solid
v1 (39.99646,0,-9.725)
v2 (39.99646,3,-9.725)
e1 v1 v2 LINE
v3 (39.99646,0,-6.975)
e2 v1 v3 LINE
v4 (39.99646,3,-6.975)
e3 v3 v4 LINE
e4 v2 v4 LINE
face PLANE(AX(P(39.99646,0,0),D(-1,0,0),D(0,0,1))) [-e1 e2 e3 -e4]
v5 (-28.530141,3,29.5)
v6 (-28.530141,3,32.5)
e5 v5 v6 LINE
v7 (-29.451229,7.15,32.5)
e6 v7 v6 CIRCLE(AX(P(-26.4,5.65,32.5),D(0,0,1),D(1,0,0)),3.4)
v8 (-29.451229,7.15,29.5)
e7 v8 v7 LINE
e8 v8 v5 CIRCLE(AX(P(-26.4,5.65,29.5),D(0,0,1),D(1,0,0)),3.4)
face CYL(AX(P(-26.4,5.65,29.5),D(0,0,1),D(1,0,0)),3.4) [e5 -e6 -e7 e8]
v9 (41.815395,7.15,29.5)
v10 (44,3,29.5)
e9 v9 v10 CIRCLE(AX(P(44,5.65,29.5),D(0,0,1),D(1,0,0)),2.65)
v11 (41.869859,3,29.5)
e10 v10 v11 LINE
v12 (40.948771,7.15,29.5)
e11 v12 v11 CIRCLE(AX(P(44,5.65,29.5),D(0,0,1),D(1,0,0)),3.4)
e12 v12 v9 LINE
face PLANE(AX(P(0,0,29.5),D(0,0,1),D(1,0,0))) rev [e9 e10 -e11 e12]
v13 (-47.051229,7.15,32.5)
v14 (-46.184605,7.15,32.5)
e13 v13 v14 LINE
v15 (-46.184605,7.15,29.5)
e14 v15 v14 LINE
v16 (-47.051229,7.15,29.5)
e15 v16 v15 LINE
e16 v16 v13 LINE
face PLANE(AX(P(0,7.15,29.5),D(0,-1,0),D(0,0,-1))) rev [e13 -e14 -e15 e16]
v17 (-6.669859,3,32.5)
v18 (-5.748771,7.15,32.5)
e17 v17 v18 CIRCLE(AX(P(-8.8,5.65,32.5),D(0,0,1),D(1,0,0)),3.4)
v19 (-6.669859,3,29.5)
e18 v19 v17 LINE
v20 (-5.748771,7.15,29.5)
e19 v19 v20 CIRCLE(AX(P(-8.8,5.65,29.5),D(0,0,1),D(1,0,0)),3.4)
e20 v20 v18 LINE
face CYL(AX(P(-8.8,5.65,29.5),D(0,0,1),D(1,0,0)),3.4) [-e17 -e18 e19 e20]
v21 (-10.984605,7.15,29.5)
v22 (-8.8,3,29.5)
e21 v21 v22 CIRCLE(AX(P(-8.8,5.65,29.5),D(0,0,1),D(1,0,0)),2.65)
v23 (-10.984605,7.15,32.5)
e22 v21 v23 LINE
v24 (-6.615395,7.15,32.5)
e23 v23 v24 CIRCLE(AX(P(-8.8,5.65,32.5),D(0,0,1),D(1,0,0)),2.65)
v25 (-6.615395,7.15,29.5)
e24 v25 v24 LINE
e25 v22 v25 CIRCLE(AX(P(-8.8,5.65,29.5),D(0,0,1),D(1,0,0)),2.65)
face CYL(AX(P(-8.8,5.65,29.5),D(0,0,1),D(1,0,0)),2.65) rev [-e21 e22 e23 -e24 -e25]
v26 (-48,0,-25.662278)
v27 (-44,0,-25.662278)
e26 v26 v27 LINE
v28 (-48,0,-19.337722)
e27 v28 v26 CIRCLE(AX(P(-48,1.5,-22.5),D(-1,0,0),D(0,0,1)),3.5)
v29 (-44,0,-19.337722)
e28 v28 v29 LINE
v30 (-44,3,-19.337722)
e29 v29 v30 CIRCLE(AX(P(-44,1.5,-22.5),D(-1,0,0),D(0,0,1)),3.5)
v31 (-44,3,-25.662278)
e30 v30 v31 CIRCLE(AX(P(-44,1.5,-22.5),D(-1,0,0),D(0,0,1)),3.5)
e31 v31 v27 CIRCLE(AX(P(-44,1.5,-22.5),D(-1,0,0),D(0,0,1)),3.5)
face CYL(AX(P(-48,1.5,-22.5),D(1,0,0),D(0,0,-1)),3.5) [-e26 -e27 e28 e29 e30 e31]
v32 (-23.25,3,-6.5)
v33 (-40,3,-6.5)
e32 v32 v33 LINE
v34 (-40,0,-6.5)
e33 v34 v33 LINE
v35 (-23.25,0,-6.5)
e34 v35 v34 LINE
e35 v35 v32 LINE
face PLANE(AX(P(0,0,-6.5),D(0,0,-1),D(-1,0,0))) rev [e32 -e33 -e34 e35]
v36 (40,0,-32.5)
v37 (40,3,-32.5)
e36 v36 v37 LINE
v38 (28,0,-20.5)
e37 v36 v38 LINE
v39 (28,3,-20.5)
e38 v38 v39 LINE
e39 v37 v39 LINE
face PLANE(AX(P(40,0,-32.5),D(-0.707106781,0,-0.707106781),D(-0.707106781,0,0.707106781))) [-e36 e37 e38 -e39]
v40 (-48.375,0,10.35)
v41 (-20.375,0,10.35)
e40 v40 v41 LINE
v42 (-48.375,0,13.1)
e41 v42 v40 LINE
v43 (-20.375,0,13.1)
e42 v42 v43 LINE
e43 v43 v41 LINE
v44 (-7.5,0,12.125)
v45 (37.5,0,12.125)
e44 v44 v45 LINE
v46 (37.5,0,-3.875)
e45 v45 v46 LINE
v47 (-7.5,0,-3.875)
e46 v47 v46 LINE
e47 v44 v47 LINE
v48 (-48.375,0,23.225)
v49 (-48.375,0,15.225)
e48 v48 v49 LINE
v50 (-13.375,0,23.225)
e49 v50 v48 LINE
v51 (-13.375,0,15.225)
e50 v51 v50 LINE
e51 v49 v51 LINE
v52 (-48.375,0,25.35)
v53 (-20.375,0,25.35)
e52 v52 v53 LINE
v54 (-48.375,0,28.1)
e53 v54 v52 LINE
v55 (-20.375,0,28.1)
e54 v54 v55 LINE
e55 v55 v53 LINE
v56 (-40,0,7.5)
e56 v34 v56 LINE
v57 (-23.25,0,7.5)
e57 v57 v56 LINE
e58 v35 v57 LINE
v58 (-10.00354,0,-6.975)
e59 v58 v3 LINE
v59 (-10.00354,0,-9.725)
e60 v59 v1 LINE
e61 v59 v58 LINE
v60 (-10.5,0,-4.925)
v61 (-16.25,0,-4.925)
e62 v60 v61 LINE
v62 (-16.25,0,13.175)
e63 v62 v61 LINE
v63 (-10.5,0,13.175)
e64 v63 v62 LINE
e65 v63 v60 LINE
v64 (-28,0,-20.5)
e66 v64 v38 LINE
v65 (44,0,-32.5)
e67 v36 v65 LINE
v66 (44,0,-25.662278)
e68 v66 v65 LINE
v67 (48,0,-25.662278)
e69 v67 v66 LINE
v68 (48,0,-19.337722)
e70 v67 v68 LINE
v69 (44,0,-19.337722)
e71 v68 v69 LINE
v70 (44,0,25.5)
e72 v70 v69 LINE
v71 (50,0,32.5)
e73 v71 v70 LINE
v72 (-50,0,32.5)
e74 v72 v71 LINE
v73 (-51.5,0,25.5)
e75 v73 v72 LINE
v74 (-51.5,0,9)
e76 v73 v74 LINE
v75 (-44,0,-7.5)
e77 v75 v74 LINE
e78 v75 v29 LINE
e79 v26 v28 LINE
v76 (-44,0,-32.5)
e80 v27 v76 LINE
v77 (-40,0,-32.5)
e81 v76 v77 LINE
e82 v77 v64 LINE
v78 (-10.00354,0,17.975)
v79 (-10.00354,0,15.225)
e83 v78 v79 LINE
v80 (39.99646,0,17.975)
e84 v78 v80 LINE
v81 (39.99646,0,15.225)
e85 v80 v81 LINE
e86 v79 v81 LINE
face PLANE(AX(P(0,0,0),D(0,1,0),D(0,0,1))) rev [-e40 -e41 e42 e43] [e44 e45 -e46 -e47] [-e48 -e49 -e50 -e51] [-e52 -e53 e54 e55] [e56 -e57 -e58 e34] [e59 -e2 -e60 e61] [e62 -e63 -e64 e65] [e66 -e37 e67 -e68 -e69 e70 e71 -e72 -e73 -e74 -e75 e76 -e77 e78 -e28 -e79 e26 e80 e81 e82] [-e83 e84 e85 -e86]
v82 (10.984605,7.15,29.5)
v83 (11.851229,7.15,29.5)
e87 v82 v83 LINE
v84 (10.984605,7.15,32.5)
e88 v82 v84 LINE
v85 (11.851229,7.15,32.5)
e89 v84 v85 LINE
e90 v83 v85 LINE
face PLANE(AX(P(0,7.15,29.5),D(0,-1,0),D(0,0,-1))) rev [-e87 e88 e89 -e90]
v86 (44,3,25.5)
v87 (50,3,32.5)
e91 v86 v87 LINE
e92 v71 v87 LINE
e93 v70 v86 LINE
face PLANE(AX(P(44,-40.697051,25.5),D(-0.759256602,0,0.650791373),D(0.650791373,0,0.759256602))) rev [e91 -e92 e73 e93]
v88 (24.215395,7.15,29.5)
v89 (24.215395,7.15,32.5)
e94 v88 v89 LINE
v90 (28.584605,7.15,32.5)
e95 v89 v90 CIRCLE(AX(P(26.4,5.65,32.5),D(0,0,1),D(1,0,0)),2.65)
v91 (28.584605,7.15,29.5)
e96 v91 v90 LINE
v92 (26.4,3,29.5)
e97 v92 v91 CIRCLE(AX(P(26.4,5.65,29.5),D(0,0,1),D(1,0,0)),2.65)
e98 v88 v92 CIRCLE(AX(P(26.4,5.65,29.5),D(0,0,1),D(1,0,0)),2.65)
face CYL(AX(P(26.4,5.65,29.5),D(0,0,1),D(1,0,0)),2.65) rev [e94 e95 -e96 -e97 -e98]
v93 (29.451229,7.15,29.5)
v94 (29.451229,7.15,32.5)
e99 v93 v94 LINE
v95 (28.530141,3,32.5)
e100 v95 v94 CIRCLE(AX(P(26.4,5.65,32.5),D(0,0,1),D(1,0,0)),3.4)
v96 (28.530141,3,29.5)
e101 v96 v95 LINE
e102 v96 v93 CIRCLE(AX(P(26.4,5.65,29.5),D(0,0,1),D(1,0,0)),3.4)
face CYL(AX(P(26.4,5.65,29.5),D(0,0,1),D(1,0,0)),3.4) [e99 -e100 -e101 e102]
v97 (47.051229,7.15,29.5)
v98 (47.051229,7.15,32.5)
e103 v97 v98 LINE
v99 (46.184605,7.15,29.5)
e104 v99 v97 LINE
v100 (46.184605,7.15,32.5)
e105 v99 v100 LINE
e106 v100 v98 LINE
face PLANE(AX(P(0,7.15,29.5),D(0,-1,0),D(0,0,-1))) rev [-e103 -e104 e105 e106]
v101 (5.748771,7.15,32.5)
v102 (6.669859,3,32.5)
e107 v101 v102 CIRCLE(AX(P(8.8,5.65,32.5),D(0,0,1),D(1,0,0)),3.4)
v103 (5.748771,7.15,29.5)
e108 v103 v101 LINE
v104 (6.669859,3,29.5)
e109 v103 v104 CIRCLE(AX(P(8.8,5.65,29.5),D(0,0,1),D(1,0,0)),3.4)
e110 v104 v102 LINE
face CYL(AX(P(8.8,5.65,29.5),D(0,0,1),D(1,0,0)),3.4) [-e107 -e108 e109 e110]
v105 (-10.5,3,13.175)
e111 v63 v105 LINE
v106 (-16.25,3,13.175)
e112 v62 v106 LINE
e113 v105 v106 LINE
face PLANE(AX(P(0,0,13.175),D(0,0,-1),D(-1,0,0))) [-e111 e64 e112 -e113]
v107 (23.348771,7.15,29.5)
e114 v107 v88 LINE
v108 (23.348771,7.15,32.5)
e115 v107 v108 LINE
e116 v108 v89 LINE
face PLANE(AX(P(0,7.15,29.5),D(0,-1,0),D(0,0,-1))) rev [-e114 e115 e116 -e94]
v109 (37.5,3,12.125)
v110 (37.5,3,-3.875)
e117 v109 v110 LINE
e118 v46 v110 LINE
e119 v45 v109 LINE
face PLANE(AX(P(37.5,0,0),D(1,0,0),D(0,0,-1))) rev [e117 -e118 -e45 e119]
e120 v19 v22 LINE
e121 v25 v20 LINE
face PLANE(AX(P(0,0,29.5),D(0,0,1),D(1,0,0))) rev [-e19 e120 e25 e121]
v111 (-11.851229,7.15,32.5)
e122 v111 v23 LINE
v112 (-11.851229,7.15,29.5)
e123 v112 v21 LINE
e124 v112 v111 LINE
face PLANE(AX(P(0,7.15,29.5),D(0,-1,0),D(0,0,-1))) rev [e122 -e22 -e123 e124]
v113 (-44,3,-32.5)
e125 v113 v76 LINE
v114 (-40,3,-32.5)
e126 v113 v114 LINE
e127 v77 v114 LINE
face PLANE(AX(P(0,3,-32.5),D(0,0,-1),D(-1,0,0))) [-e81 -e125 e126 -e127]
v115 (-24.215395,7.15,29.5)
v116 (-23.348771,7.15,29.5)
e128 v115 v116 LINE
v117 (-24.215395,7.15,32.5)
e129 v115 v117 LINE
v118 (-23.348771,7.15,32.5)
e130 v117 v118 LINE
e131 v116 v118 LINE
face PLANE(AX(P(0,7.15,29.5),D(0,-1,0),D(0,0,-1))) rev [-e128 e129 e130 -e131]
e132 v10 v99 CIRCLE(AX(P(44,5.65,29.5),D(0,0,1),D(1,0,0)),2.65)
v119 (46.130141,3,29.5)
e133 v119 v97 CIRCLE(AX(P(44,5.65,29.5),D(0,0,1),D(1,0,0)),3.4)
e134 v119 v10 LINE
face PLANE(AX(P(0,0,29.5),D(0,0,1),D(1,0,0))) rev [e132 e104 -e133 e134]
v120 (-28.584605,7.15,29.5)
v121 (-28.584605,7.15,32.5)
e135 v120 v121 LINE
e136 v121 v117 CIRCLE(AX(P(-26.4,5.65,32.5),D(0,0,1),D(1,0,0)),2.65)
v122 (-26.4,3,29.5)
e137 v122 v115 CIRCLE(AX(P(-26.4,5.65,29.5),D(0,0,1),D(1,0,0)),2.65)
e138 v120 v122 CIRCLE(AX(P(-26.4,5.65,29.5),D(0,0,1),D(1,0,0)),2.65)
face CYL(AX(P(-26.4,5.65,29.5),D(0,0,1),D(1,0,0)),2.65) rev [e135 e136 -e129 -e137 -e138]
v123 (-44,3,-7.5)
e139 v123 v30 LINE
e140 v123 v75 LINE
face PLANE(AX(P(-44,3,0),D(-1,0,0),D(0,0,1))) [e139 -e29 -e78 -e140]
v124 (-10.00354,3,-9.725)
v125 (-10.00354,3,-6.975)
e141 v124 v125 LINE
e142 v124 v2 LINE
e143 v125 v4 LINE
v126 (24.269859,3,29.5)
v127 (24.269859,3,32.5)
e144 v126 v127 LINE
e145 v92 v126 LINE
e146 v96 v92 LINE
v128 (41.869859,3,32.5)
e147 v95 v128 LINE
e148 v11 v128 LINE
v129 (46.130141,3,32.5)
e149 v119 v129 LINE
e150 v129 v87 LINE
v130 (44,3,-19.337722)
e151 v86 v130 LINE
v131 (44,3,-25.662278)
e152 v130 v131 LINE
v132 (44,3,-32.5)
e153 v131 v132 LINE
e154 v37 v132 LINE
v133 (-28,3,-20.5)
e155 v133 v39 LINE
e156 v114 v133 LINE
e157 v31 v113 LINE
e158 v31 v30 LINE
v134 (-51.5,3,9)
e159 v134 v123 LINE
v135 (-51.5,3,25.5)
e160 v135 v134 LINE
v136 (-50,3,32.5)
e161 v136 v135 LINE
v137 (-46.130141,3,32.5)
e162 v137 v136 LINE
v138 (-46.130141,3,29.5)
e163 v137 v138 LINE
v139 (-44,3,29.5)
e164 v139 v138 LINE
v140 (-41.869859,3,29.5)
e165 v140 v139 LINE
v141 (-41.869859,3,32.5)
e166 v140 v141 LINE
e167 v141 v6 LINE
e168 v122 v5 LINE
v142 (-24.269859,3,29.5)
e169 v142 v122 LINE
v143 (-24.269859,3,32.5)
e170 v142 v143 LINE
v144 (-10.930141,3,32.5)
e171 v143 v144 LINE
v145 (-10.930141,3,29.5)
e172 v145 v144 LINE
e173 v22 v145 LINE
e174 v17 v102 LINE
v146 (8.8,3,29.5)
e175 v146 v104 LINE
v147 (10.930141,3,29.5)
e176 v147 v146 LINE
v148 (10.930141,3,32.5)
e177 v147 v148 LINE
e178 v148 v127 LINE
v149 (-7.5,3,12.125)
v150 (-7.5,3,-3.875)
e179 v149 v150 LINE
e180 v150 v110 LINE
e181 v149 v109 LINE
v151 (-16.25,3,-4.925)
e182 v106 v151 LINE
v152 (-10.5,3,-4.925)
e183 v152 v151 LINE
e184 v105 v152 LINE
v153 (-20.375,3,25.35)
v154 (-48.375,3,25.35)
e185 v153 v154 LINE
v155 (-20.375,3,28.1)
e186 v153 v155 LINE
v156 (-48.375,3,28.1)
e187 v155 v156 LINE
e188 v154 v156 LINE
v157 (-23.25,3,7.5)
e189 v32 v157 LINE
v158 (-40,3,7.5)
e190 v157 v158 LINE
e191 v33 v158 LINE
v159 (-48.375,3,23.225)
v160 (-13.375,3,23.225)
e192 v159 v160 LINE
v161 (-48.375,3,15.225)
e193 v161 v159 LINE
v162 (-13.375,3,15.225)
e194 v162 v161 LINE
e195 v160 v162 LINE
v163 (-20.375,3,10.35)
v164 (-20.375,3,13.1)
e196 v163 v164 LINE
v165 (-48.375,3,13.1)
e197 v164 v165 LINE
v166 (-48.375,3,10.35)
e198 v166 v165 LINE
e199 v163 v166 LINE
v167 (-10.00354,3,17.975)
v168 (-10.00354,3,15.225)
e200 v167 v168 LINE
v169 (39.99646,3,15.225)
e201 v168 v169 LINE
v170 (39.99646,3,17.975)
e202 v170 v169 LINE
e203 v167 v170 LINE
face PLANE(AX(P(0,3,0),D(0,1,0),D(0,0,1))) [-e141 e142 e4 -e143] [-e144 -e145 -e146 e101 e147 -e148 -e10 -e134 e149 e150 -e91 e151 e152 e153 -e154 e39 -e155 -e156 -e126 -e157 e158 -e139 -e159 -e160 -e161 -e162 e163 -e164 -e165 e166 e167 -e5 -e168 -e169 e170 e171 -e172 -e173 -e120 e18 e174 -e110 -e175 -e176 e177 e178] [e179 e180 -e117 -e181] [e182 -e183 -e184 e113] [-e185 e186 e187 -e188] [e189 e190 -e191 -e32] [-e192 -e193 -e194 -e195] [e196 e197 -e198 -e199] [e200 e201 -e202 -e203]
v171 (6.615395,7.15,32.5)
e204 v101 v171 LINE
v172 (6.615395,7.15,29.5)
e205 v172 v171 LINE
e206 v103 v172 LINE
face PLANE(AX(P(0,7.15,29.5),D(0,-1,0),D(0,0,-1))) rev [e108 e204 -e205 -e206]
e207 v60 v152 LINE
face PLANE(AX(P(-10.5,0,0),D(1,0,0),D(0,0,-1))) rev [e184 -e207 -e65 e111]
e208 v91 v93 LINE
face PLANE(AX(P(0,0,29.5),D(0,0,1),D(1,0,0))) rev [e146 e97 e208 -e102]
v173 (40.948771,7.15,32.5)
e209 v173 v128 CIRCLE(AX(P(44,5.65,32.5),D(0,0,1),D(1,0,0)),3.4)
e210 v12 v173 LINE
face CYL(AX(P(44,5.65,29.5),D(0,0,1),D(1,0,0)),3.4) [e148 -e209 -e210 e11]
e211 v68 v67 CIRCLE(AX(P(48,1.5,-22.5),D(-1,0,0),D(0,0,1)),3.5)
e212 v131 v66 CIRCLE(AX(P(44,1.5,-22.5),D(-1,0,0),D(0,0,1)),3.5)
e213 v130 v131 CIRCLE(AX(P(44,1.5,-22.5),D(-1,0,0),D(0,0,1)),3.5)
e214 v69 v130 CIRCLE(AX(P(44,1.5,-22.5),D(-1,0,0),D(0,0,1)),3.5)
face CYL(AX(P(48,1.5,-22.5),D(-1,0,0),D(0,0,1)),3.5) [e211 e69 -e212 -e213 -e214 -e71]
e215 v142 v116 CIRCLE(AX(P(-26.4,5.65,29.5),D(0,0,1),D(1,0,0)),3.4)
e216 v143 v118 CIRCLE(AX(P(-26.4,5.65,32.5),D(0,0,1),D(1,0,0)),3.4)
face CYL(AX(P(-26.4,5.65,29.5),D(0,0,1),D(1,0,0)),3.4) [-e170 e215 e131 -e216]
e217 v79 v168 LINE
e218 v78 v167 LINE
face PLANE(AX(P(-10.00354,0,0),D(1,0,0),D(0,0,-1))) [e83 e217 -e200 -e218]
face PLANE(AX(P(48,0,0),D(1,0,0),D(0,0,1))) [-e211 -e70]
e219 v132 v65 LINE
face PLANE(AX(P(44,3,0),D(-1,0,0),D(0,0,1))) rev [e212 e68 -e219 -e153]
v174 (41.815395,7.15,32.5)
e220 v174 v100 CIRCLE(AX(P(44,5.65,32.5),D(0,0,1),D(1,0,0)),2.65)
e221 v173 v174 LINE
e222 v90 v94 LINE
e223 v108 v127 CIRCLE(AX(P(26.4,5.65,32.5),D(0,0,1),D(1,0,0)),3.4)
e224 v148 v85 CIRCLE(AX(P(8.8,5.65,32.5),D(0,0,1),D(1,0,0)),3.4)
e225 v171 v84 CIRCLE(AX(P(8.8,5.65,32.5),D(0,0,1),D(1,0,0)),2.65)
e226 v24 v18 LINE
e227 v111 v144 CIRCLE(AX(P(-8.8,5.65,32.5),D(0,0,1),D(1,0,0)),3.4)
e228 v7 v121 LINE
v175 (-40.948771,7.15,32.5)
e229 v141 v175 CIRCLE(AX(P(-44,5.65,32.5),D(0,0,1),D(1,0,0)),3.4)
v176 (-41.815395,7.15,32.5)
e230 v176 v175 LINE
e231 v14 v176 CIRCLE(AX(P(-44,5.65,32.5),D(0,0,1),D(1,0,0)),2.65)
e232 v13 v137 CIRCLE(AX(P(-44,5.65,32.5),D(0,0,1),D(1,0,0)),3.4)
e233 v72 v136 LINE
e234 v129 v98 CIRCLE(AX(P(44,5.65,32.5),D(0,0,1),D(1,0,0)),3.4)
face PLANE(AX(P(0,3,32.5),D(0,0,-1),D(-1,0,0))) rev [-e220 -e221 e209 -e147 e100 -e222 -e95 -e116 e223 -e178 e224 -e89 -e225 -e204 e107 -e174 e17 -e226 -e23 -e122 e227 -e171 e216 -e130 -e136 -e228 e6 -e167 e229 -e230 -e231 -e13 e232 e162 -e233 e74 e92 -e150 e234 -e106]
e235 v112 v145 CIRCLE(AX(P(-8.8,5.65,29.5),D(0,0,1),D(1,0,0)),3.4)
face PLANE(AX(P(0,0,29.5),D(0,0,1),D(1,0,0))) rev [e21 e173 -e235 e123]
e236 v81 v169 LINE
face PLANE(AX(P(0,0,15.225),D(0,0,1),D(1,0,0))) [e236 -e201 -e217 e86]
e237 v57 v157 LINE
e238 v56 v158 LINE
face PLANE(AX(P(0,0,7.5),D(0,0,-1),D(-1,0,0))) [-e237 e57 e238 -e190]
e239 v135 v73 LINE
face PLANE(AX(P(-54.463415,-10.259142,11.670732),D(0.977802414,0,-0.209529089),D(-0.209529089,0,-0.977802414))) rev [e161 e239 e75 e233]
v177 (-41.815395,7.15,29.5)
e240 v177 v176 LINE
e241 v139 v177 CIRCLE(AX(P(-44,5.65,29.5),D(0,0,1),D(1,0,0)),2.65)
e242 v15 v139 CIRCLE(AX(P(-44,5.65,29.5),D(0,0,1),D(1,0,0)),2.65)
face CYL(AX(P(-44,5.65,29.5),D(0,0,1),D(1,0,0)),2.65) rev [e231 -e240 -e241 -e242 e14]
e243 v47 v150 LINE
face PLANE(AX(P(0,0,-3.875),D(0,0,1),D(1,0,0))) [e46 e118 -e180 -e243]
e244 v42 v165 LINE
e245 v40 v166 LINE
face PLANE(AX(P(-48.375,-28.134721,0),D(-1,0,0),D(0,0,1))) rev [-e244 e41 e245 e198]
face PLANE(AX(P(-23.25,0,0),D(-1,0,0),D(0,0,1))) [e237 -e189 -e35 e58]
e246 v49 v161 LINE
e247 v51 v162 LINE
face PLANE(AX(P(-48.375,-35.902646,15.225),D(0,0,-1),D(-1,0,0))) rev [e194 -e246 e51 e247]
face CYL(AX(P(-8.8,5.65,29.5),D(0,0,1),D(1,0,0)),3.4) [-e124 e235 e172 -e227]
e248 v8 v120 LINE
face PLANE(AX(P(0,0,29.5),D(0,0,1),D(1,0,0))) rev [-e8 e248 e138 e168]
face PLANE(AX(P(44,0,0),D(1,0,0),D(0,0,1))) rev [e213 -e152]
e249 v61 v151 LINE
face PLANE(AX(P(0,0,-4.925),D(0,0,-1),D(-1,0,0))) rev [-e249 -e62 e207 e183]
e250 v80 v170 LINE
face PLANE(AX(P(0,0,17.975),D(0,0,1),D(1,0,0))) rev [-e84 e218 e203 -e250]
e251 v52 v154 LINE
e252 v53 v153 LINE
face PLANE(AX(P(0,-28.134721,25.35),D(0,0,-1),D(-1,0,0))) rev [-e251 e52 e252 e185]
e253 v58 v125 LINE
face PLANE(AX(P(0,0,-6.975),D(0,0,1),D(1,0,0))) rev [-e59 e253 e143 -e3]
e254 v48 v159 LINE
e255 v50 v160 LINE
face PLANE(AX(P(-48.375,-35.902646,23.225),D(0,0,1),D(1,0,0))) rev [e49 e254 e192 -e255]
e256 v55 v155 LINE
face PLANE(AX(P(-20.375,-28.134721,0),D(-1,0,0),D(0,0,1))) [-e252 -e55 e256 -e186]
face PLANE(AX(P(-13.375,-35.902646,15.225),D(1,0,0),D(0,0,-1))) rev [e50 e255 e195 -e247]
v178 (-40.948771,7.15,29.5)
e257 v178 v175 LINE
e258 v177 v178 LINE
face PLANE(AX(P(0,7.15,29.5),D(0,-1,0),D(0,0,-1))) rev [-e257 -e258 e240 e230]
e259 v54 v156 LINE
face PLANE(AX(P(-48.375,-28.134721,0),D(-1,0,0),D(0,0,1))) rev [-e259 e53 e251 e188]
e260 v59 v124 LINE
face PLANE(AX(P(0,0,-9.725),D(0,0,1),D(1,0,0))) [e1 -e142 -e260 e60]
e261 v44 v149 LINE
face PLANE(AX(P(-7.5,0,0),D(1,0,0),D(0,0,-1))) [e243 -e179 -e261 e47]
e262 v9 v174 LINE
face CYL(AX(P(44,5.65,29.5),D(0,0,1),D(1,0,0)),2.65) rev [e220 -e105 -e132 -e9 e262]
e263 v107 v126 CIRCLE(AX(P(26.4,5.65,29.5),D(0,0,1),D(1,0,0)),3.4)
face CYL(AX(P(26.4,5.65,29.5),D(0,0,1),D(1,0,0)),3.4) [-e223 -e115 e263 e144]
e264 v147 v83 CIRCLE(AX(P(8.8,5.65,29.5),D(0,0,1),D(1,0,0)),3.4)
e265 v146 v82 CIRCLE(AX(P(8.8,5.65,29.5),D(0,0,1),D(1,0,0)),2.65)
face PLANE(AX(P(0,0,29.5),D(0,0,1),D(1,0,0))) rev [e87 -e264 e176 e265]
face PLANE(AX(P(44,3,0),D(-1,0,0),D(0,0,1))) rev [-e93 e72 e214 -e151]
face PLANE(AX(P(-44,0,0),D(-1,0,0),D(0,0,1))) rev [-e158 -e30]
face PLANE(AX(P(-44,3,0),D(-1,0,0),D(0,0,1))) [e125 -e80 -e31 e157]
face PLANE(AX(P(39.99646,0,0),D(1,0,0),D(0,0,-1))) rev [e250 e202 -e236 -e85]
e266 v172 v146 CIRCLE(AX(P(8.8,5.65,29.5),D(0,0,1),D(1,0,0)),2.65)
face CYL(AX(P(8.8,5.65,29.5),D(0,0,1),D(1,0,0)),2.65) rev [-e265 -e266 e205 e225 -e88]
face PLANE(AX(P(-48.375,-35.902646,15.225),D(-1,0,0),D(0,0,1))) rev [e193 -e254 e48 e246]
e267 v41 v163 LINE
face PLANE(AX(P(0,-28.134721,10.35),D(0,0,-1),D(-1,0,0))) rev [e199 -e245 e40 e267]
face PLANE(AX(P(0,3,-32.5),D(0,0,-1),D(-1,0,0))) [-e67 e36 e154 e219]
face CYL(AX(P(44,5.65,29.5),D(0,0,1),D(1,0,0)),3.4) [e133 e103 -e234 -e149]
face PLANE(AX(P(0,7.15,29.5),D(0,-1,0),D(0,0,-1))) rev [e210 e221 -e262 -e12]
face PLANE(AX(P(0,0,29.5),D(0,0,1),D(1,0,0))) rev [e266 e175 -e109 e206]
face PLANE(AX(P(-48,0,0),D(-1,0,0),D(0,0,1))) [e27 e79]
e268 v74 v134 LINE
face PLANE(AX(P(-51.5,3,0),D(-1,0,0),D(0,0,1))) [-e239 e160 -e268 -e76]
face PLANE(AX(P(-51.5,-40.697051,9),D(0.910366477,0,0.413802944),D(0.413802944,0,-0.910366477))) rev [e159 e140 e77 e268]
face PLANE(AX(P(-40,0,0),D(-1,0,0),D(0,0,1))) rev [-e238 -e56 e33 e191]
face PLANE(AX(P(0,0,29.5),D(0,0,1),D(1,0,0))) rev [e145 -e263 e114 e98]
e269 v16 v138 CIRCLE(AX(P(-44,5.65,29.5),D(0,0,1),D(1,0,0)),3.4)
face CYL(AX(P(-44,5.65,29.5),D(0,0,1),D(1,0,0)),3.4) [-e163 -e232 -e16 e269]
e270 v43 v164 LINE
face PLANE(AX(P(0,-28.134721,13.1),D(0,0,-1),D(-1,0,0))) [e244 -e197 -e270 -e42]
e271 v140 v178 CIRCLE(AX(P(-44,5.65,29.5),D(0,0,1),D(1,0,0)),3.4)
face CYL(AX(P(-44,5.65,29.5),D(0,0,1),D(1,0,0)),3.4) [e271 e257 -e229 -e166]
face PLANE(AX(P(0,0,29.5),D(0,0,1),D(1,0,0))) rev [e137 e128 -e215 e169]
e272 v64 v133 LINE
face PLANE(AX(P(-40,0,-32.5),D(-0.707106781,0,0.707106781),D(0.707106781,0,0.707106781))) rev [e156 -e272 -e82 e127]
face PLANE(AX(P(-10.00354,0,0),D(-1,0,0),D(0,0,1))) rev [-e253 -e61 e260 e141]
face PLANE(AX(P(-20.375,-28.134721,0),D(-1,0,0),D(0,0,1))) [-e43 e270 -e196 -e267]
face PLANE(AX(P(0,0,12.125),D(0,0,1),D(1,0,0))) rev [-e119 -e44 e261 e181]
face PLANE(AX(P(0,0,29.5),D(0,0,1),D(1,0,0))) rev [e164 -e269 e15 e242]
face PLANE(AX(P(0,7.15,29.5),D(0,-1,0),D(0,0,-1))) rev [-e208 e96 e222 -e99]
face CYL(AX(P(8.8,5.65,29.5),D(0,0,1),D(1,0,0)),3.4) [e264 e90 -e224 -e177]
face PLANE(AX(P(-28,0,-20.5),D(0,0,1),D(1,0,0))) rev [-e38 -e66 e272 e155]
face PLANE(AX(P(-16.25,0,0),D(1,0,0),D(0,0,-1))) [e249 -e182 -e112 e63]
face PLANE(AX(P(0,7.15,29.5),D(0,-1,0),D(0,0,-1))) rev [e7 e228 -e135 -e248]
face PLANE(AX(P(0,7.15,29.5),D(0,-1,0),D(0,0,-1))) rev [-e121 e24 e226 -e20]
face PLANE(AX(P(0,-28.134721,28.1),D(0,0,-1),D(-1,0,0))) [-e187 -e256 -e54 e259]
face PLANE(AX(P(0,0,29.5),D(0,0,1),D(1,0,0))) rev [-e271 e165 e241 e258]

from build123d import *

# Parameters (mm, degrees)
SKETCH1_W            = 88
SKETCH1_H            = 65
SKETCH1_W_2          = 7.5
SKETCH1_H_2          = 33
BOSS_EXTRUDE1_DEPTH  = 3
BOSS_EXTRUDE8_DEPTH  = 4
CUT_EXTRUDE18_DEPTH  = 61.971304726
SKETCH8_W            = 16
SKETCH8_H            = 45
SKETCH8_W_2          = 2.75
SKETCH8_H_2          = 50
SKETCH8_W_3          = 18.1
SKETCH8_H_3          = 4.25
SKETCH8_H_4          = 1.5
CUT_EXTRUDE19_DEPTH  = 64.044492712
SKETCH10_W           = 16.75
SKETCH10_H           = 14
CUT_EXTRUDE21_DEPTH  = 61.971304726
BOSS_EXTRUDE10_DEPTH = 3
BOSS_EXTRUDE9_START  = -3
BOSS_EXTRUDE9_DEPTH  = 3
SKETCH16_W           = 35
SKETCH16_H           = 8
CUT_EXTRUDE22_DEPTH  = 3
SKETCH17_W           = 28
SKETCH17_H           = 2.75
CUT_EXTRUDE23_DEPTH  = 3
CUT_EXTRUDE24_DEPTH  = 3


# Read off the part's stored shape, not the designer's step: Boss-Extrude9
with BuildPart() as part:
    # Sketch1 → Boss-Extrude1 (new body)
    with BuildSketch(Plane(origin=(0, 0, 0), x_dir=(1, 0, 0), z_dir=(0, 1, 0))):
        Rectangle(SKETCH1_W, SKETCH1_H)
        with Locations((-47.75, -9)):
            Rectangle(SKETCH1_W_2, SKETCH1_H_2)
        with Locations((47.75, -9)):
            Rectangle(SKETCH1_W_2, SKETCH1_H_2)
    extrude(amount=BOSS_EXTRUDE1_DEPTH)

    # Sketch2 → Boss-Extrude8 (add)
    with BuildSketch(Plane.ZY.offset(44)):
        with BuildLine():
            ThreePointArc((-19, 1.5), (-23.268774411, 4.914525722), (-25.66227766, 0))
            Line((-25.66227766, 0), (-19.33772234, 0))
            ThreePointArc((-19.33772234, 0), (-19.085474278, 0.731225589), (-19, 1.5))
        make_face()
    boss_extrude8 = extrude(amount=BOSS_EXTRUDE8_DEPTH)

    # Sketch7 → Cut-Extrude18 (cut, through all)
    with BuildSketch(Plane(origin=(0, 3, 0), x_dir=(1, 0, 0), z_dir=(0, 1, 0))):
        Polygon((-40, 32.5), (-28, 20.5), (0, 20.5), (0, 32.5), align=None)
    cut_extrude18 = extrude(amount=-CUT_EXTRUDE18_DEPTH, mode=Mode.SUBTRACT)

    # Mirror4: Cut-Extrude18 across plane
    add(cut_extrude18.mirror(Plane(origin=(0, 0, 0), x_dir=(0, 0, 1), z_dir=(1, 0, 0))), mode=Mode.SUBTRACT)

    # Mirror5: Boss-Extrude8 across plane
    add(boss_extrude8.mirror(Plane(origin=(0, 0, 0), x_dir=(0, 0, 1), z_dir=(1, 0, 0))))

    # Sketch8 → Cut-Extrude19 (cut, through all)
    with BuildSketch(Plane(origin=(1.47526487, 3, -1.547457662), x_dir=(0, 0, -1), z_dir=(0, 1, 0))):
        with Locations((-5.672457662, -13.52473513)):
            Rectangle(SKETCH8_W, SKETCH8_H)
        with Locations((6.802542338, -13.521195307)):
            Rectangle(SKETCH8_W_2, SKETCH8_H_2)
        with Locations((-18.147457662, -13.521195307)):
            Rectangle(SKETCH8_W_2, SKETCH8_H_2)
        with Locations((-5.672457662, 15.60026487)):
            Rectangle(SKETCH8_W_3, SKETCH8_H_3)
        with Locations((-5.672457662, 12.72526487)):
            Rectangle(SKETCH8_W_3, SKETCH8_H_4)
    extrude(amount=-CUT_EXTRUDE19_DEPTH, mode=Mode.SUBTRACT)

    # Sketch10 → Cut-Extrude21 (cut, through all)
    with BuildSketch(Plane(origin=(0, 3, 0), x_dir=(1, 0, 0), z_dir=(0, 1, 0))):
        with Locations((-31.625, -0.5)):
            Rectangle(SKETCH10_W, SKETCH10_H)
    extrude(amount=-CUT_EXTRUDE21_DEPTH, mode=Mode.SUBTRACT)

    # Sketch15 → Boss-Extrude10 (add)
    with BuildSketch(Plane.XY.offset(32.5)):
        with BuildLine():
            Line((-46.184605227, 7.15), (-47.05122926, 7.15))
            ThreePointArc((-47.05122926, 7.15), (-46.886173938, 3.852779924), (-44, 2.25))
            Line((-44, 2.25), (-44, 3))
            ThreePointArc((-44, 3), (-46.344941364, 4.41559731), (-46.184605227, 7.15))
        make_face()
        with BuildLine():
            ThreePointArc((-40.6, 5.65), (-40.688340334, 6.42000666), (-40.94877074, 7.15))
            Line((-40.94877074, 7.15), (-41.815394773, 7.15))
            ThreePointArc((-41.815394773, 7.15), (-41.469021548, 6.435269427), (-41.35, 5.65))
            ThreePointArc((-41.35, 5.65), (-42.12616703, 3.77616703), (-44, 3))
            Line((-44, 3), (-41.86985916, 3))
            ThreePointArc((-41.86985916, 3), (-40.933855935, 4.180727877), (-40.6, 5.65))
        make_face()
        with BuildLine():
            ThreePointArc((-29.45122926, 7.15), (-29.719227927, 4.913300625), (-28.53014084, 3))
            Line((-28.53014084, 3), (-26.4, 3))
            ThreePointArc((-26.4, 3), (-28.744941364, 4.41559731), (-28.584605227, 7.15))
            Line((-28.584605227, 7.15), (-29.45122926, 7.15))
        make_face()
        with BuildLine():
            Line((-26.4, 3), (-24.26985916, 3))
            ThreePointArc((-24.26985916, 3), (-23.333855935, 4.180727877), (-23, 5.65))
            ThreePointArc((-23, 5.65), (-23.088340334, 6.42000666), (-23.34877074, 7.15))
            Line((-23.34877074, 7.15), (-24.215394773, 7.15))
            ThreePointArc((-24.215394773, 7.15), (-23.869021548, 6.435269427), (-23.75, 5.65))
            ThreePointArc((-23.75, 5.65), (-24.52616703, 3.77616703), (-26.4, 3))
        make_face()
        with BuildLine():
            Line((-8.8, 3), (-6.66985916, 3))
            ThreePointArc((-6.66985916, 3), (-5.733855935, 4.180727877), (-5.4, 5.65))
            ThreePointArc((-5.4, 5.65), (-5.488340334, 6.42000666), (-5.74877074, 7.15))
            Line((-5.74877074, 7.15), (-6.615394773, 7.15))
            ThreePointArc((-6.615394773, 7.15), (-6.269021548, 6.435269427), (-6.15, 5.65))
            ThreePointArc((-6.15, 5.65), (-6.92616703, 3.77616703), (-8.8, 3))
        make_face()
        with BuildLine():
            ThreePointArc((-11.85122926, 7.15), (-12.119227927, 4.913300625), (-10.93014084, 3))
            Line((-10.93014084, 3), (-8.8, 3))
            ThreePointArc((-8.8, 3), (-11.144941364, 4.41559731), (-10.984605227, 7.15))
            Line((-10.984605227, 7.15), (-11.85122926, 7.15))
        make_face()
        with BuildLine():
            Line((8.800000027, 3), (10.93014084, 3))
            ThreePointArc((10.93014084, 3), (11.866144065, 4.180727877), (12.2, 5.65))
            ThreePointArc((12.2, 5.65), (12.111659666, 6.42000666), (11.85122926, 7.15))
            Line((11.85122926, 7.15), (10.984605227, 7.15))
            ThreePointArc((10.984605227, 7.15), (11.330978452, 6.435269427), (11.45, 5.65))
            ThreePointArc((11.45, 5.65), (10.67383298, 3.77616704), (8.800000027, 3))
        make_face()
        with BuildLine():
            ThreePointArc((5.74877074, 7.15), (5.480772073, 4.913300625), (6.66985916, 3))
            Line((6.66985916, 3), (8.800000027, 3))
            ThreePointArc((8.800000027, 3), (6.455058643, 4.415597298), (6.615394773, 7.15))
            Line((6.615394773, 7.15), (5.74877074, 7.15))
        make_face()
        with BuildLine():
            Line((26.4, 3), (28.53014084, 3))
            ThreePointArc((28.53014084, 3), (29.466144065, 4.180727877), (29.8, 5.65))
            ThreePointArc((29.8, 5.65), (29.711659666, 6.42000666), (29.45122926, 7.15))
            Line((29.45122926, 7.15), (28.584605227, 7.15))
            ThreePointArc((28.584605227, 7.15), (28.930978452, 6.435269427), (29.05, 5.65))
            ThreePointArc((29.05, 5.65), (28.27383297, 3.77616703), (26.4, 3))
        make_face()
        with BuildLine():
            ThreePointArc((23.34877074, 7.15), (23.080772073, 4.913300625), (24.26985916, 3))
            Line((24.26985916, 3), (26.4, 3))
            ThreePointArc((26.4, 3), (24.055058636, 4.41559731), (24.215394773, 7.15))
            Line((24.215394773, 7.15), (23.34877074, 7.15))
        make_face()
        with BuildLine():
            ThreePointArc((40.94877074, 7.15), (40.680772073, 4.913300625), (41.86985916, 3))
            Line((41.86985916, 3), (44, 3))
            ThreePointArc((44, 3), (41.655058636, 4.41559731), (41.815394773, 7.15))
            Line((41.815394773, 7.15), (40.94877074, 7.15))
        make_face()
        with BuildLine():
            ThreePointArc((47.4, 5.65), (47.311659666, 6.42000666), (47.05122926, 7.15))
            Line((47.05122926, 7.15), (46.184605227, 7.15))
            ThreePointArc((46.184605227, 7.15), (46.530978452, 6.435269427), (46.65, 5.65))
            ThreePointArc((46.65, 5.65), (45.87383297, 3.77616703), (44, 3))
            Line((44, 3), (44, 2.25))
            ThreePointArc((44, 2.25), (46.404163056, 3.245836944), (47.4, 5.65))
        make_face()
    extrude(amount=-BOSS_EXTRUDE10_DEPTH)

    # Boss-Extrude9 outline → Boss-Extrude9 (add)
    with BuildSketch(Plane(origin=(0, 3, 0), x_dir=(1, 0, 0), z_dir=(0, 1, 0)).offset(BOSS_EXTRUDE9_START)):
        Polygon((-50, -32.5), (-44, -32.5), (-44, -29.5), (-44, -25.5), (-51.5, -25.5), align=None)
        Polygon((44, -32.5), (50, -32.5), (51.5, -25.5), (44, -25.5), (44, -29.5), align=None)
    extrude(amount=BOSS_EXTRUDE9_DEPTH)

    # Sketch16 → Cut-Extrude22 (cut)
    with BuildSketch(Plane(origin=(0, 3, 0), x_dir=(1, 0, 0), z_dir=(0, 1, 0))):
        with Locations((-30.875, -19.225)):
            Rectangle(SKETCH16_W, SKETCH16_H)
    extrude(amount=-CUT_EXTRUDE22_DEPTH, mode=Mode.SUBTRACT)

    # Sketch17 → Cut-Extrude23 (cut)
    with BuildSketch(Plane(origin=(0, 3, 0), x_dir=(1, 0, 0), z_dir=(0, 1, 0))):
        with Locations((-34.375, -11.725)):
            Rectangle(SKETCH17_W, SKETCH17_H)
        with Locations((-34.375, -26.725)):
            Rectangle(SKETCH17_W, SKETCH17_H)
    extrude(amount=-CUT_EXTRUDE23_DEPTH, mode=Mode.SUBTRACT)

    # Sketch19 → Cut-Extrude24 (cut)
    with BuildSketch(Plane(origin=(0, 3, 0), x_dir=(1, 0, 0), z_dir=(0, 1, 0))):
        Polygon((50, -32.5), (51.5, -25.5), (51.5, 7.5), (44, 7.5), (44, -25.5), align=None)
        Polygon((-51.5, -9), (-44, 7.5), (-51.5, 7.5), align=None)
    extrude(amount=-CUT_EXTRUDE24_DEPTH, mode=Mode.SUBTRACT)


solid = part.part
